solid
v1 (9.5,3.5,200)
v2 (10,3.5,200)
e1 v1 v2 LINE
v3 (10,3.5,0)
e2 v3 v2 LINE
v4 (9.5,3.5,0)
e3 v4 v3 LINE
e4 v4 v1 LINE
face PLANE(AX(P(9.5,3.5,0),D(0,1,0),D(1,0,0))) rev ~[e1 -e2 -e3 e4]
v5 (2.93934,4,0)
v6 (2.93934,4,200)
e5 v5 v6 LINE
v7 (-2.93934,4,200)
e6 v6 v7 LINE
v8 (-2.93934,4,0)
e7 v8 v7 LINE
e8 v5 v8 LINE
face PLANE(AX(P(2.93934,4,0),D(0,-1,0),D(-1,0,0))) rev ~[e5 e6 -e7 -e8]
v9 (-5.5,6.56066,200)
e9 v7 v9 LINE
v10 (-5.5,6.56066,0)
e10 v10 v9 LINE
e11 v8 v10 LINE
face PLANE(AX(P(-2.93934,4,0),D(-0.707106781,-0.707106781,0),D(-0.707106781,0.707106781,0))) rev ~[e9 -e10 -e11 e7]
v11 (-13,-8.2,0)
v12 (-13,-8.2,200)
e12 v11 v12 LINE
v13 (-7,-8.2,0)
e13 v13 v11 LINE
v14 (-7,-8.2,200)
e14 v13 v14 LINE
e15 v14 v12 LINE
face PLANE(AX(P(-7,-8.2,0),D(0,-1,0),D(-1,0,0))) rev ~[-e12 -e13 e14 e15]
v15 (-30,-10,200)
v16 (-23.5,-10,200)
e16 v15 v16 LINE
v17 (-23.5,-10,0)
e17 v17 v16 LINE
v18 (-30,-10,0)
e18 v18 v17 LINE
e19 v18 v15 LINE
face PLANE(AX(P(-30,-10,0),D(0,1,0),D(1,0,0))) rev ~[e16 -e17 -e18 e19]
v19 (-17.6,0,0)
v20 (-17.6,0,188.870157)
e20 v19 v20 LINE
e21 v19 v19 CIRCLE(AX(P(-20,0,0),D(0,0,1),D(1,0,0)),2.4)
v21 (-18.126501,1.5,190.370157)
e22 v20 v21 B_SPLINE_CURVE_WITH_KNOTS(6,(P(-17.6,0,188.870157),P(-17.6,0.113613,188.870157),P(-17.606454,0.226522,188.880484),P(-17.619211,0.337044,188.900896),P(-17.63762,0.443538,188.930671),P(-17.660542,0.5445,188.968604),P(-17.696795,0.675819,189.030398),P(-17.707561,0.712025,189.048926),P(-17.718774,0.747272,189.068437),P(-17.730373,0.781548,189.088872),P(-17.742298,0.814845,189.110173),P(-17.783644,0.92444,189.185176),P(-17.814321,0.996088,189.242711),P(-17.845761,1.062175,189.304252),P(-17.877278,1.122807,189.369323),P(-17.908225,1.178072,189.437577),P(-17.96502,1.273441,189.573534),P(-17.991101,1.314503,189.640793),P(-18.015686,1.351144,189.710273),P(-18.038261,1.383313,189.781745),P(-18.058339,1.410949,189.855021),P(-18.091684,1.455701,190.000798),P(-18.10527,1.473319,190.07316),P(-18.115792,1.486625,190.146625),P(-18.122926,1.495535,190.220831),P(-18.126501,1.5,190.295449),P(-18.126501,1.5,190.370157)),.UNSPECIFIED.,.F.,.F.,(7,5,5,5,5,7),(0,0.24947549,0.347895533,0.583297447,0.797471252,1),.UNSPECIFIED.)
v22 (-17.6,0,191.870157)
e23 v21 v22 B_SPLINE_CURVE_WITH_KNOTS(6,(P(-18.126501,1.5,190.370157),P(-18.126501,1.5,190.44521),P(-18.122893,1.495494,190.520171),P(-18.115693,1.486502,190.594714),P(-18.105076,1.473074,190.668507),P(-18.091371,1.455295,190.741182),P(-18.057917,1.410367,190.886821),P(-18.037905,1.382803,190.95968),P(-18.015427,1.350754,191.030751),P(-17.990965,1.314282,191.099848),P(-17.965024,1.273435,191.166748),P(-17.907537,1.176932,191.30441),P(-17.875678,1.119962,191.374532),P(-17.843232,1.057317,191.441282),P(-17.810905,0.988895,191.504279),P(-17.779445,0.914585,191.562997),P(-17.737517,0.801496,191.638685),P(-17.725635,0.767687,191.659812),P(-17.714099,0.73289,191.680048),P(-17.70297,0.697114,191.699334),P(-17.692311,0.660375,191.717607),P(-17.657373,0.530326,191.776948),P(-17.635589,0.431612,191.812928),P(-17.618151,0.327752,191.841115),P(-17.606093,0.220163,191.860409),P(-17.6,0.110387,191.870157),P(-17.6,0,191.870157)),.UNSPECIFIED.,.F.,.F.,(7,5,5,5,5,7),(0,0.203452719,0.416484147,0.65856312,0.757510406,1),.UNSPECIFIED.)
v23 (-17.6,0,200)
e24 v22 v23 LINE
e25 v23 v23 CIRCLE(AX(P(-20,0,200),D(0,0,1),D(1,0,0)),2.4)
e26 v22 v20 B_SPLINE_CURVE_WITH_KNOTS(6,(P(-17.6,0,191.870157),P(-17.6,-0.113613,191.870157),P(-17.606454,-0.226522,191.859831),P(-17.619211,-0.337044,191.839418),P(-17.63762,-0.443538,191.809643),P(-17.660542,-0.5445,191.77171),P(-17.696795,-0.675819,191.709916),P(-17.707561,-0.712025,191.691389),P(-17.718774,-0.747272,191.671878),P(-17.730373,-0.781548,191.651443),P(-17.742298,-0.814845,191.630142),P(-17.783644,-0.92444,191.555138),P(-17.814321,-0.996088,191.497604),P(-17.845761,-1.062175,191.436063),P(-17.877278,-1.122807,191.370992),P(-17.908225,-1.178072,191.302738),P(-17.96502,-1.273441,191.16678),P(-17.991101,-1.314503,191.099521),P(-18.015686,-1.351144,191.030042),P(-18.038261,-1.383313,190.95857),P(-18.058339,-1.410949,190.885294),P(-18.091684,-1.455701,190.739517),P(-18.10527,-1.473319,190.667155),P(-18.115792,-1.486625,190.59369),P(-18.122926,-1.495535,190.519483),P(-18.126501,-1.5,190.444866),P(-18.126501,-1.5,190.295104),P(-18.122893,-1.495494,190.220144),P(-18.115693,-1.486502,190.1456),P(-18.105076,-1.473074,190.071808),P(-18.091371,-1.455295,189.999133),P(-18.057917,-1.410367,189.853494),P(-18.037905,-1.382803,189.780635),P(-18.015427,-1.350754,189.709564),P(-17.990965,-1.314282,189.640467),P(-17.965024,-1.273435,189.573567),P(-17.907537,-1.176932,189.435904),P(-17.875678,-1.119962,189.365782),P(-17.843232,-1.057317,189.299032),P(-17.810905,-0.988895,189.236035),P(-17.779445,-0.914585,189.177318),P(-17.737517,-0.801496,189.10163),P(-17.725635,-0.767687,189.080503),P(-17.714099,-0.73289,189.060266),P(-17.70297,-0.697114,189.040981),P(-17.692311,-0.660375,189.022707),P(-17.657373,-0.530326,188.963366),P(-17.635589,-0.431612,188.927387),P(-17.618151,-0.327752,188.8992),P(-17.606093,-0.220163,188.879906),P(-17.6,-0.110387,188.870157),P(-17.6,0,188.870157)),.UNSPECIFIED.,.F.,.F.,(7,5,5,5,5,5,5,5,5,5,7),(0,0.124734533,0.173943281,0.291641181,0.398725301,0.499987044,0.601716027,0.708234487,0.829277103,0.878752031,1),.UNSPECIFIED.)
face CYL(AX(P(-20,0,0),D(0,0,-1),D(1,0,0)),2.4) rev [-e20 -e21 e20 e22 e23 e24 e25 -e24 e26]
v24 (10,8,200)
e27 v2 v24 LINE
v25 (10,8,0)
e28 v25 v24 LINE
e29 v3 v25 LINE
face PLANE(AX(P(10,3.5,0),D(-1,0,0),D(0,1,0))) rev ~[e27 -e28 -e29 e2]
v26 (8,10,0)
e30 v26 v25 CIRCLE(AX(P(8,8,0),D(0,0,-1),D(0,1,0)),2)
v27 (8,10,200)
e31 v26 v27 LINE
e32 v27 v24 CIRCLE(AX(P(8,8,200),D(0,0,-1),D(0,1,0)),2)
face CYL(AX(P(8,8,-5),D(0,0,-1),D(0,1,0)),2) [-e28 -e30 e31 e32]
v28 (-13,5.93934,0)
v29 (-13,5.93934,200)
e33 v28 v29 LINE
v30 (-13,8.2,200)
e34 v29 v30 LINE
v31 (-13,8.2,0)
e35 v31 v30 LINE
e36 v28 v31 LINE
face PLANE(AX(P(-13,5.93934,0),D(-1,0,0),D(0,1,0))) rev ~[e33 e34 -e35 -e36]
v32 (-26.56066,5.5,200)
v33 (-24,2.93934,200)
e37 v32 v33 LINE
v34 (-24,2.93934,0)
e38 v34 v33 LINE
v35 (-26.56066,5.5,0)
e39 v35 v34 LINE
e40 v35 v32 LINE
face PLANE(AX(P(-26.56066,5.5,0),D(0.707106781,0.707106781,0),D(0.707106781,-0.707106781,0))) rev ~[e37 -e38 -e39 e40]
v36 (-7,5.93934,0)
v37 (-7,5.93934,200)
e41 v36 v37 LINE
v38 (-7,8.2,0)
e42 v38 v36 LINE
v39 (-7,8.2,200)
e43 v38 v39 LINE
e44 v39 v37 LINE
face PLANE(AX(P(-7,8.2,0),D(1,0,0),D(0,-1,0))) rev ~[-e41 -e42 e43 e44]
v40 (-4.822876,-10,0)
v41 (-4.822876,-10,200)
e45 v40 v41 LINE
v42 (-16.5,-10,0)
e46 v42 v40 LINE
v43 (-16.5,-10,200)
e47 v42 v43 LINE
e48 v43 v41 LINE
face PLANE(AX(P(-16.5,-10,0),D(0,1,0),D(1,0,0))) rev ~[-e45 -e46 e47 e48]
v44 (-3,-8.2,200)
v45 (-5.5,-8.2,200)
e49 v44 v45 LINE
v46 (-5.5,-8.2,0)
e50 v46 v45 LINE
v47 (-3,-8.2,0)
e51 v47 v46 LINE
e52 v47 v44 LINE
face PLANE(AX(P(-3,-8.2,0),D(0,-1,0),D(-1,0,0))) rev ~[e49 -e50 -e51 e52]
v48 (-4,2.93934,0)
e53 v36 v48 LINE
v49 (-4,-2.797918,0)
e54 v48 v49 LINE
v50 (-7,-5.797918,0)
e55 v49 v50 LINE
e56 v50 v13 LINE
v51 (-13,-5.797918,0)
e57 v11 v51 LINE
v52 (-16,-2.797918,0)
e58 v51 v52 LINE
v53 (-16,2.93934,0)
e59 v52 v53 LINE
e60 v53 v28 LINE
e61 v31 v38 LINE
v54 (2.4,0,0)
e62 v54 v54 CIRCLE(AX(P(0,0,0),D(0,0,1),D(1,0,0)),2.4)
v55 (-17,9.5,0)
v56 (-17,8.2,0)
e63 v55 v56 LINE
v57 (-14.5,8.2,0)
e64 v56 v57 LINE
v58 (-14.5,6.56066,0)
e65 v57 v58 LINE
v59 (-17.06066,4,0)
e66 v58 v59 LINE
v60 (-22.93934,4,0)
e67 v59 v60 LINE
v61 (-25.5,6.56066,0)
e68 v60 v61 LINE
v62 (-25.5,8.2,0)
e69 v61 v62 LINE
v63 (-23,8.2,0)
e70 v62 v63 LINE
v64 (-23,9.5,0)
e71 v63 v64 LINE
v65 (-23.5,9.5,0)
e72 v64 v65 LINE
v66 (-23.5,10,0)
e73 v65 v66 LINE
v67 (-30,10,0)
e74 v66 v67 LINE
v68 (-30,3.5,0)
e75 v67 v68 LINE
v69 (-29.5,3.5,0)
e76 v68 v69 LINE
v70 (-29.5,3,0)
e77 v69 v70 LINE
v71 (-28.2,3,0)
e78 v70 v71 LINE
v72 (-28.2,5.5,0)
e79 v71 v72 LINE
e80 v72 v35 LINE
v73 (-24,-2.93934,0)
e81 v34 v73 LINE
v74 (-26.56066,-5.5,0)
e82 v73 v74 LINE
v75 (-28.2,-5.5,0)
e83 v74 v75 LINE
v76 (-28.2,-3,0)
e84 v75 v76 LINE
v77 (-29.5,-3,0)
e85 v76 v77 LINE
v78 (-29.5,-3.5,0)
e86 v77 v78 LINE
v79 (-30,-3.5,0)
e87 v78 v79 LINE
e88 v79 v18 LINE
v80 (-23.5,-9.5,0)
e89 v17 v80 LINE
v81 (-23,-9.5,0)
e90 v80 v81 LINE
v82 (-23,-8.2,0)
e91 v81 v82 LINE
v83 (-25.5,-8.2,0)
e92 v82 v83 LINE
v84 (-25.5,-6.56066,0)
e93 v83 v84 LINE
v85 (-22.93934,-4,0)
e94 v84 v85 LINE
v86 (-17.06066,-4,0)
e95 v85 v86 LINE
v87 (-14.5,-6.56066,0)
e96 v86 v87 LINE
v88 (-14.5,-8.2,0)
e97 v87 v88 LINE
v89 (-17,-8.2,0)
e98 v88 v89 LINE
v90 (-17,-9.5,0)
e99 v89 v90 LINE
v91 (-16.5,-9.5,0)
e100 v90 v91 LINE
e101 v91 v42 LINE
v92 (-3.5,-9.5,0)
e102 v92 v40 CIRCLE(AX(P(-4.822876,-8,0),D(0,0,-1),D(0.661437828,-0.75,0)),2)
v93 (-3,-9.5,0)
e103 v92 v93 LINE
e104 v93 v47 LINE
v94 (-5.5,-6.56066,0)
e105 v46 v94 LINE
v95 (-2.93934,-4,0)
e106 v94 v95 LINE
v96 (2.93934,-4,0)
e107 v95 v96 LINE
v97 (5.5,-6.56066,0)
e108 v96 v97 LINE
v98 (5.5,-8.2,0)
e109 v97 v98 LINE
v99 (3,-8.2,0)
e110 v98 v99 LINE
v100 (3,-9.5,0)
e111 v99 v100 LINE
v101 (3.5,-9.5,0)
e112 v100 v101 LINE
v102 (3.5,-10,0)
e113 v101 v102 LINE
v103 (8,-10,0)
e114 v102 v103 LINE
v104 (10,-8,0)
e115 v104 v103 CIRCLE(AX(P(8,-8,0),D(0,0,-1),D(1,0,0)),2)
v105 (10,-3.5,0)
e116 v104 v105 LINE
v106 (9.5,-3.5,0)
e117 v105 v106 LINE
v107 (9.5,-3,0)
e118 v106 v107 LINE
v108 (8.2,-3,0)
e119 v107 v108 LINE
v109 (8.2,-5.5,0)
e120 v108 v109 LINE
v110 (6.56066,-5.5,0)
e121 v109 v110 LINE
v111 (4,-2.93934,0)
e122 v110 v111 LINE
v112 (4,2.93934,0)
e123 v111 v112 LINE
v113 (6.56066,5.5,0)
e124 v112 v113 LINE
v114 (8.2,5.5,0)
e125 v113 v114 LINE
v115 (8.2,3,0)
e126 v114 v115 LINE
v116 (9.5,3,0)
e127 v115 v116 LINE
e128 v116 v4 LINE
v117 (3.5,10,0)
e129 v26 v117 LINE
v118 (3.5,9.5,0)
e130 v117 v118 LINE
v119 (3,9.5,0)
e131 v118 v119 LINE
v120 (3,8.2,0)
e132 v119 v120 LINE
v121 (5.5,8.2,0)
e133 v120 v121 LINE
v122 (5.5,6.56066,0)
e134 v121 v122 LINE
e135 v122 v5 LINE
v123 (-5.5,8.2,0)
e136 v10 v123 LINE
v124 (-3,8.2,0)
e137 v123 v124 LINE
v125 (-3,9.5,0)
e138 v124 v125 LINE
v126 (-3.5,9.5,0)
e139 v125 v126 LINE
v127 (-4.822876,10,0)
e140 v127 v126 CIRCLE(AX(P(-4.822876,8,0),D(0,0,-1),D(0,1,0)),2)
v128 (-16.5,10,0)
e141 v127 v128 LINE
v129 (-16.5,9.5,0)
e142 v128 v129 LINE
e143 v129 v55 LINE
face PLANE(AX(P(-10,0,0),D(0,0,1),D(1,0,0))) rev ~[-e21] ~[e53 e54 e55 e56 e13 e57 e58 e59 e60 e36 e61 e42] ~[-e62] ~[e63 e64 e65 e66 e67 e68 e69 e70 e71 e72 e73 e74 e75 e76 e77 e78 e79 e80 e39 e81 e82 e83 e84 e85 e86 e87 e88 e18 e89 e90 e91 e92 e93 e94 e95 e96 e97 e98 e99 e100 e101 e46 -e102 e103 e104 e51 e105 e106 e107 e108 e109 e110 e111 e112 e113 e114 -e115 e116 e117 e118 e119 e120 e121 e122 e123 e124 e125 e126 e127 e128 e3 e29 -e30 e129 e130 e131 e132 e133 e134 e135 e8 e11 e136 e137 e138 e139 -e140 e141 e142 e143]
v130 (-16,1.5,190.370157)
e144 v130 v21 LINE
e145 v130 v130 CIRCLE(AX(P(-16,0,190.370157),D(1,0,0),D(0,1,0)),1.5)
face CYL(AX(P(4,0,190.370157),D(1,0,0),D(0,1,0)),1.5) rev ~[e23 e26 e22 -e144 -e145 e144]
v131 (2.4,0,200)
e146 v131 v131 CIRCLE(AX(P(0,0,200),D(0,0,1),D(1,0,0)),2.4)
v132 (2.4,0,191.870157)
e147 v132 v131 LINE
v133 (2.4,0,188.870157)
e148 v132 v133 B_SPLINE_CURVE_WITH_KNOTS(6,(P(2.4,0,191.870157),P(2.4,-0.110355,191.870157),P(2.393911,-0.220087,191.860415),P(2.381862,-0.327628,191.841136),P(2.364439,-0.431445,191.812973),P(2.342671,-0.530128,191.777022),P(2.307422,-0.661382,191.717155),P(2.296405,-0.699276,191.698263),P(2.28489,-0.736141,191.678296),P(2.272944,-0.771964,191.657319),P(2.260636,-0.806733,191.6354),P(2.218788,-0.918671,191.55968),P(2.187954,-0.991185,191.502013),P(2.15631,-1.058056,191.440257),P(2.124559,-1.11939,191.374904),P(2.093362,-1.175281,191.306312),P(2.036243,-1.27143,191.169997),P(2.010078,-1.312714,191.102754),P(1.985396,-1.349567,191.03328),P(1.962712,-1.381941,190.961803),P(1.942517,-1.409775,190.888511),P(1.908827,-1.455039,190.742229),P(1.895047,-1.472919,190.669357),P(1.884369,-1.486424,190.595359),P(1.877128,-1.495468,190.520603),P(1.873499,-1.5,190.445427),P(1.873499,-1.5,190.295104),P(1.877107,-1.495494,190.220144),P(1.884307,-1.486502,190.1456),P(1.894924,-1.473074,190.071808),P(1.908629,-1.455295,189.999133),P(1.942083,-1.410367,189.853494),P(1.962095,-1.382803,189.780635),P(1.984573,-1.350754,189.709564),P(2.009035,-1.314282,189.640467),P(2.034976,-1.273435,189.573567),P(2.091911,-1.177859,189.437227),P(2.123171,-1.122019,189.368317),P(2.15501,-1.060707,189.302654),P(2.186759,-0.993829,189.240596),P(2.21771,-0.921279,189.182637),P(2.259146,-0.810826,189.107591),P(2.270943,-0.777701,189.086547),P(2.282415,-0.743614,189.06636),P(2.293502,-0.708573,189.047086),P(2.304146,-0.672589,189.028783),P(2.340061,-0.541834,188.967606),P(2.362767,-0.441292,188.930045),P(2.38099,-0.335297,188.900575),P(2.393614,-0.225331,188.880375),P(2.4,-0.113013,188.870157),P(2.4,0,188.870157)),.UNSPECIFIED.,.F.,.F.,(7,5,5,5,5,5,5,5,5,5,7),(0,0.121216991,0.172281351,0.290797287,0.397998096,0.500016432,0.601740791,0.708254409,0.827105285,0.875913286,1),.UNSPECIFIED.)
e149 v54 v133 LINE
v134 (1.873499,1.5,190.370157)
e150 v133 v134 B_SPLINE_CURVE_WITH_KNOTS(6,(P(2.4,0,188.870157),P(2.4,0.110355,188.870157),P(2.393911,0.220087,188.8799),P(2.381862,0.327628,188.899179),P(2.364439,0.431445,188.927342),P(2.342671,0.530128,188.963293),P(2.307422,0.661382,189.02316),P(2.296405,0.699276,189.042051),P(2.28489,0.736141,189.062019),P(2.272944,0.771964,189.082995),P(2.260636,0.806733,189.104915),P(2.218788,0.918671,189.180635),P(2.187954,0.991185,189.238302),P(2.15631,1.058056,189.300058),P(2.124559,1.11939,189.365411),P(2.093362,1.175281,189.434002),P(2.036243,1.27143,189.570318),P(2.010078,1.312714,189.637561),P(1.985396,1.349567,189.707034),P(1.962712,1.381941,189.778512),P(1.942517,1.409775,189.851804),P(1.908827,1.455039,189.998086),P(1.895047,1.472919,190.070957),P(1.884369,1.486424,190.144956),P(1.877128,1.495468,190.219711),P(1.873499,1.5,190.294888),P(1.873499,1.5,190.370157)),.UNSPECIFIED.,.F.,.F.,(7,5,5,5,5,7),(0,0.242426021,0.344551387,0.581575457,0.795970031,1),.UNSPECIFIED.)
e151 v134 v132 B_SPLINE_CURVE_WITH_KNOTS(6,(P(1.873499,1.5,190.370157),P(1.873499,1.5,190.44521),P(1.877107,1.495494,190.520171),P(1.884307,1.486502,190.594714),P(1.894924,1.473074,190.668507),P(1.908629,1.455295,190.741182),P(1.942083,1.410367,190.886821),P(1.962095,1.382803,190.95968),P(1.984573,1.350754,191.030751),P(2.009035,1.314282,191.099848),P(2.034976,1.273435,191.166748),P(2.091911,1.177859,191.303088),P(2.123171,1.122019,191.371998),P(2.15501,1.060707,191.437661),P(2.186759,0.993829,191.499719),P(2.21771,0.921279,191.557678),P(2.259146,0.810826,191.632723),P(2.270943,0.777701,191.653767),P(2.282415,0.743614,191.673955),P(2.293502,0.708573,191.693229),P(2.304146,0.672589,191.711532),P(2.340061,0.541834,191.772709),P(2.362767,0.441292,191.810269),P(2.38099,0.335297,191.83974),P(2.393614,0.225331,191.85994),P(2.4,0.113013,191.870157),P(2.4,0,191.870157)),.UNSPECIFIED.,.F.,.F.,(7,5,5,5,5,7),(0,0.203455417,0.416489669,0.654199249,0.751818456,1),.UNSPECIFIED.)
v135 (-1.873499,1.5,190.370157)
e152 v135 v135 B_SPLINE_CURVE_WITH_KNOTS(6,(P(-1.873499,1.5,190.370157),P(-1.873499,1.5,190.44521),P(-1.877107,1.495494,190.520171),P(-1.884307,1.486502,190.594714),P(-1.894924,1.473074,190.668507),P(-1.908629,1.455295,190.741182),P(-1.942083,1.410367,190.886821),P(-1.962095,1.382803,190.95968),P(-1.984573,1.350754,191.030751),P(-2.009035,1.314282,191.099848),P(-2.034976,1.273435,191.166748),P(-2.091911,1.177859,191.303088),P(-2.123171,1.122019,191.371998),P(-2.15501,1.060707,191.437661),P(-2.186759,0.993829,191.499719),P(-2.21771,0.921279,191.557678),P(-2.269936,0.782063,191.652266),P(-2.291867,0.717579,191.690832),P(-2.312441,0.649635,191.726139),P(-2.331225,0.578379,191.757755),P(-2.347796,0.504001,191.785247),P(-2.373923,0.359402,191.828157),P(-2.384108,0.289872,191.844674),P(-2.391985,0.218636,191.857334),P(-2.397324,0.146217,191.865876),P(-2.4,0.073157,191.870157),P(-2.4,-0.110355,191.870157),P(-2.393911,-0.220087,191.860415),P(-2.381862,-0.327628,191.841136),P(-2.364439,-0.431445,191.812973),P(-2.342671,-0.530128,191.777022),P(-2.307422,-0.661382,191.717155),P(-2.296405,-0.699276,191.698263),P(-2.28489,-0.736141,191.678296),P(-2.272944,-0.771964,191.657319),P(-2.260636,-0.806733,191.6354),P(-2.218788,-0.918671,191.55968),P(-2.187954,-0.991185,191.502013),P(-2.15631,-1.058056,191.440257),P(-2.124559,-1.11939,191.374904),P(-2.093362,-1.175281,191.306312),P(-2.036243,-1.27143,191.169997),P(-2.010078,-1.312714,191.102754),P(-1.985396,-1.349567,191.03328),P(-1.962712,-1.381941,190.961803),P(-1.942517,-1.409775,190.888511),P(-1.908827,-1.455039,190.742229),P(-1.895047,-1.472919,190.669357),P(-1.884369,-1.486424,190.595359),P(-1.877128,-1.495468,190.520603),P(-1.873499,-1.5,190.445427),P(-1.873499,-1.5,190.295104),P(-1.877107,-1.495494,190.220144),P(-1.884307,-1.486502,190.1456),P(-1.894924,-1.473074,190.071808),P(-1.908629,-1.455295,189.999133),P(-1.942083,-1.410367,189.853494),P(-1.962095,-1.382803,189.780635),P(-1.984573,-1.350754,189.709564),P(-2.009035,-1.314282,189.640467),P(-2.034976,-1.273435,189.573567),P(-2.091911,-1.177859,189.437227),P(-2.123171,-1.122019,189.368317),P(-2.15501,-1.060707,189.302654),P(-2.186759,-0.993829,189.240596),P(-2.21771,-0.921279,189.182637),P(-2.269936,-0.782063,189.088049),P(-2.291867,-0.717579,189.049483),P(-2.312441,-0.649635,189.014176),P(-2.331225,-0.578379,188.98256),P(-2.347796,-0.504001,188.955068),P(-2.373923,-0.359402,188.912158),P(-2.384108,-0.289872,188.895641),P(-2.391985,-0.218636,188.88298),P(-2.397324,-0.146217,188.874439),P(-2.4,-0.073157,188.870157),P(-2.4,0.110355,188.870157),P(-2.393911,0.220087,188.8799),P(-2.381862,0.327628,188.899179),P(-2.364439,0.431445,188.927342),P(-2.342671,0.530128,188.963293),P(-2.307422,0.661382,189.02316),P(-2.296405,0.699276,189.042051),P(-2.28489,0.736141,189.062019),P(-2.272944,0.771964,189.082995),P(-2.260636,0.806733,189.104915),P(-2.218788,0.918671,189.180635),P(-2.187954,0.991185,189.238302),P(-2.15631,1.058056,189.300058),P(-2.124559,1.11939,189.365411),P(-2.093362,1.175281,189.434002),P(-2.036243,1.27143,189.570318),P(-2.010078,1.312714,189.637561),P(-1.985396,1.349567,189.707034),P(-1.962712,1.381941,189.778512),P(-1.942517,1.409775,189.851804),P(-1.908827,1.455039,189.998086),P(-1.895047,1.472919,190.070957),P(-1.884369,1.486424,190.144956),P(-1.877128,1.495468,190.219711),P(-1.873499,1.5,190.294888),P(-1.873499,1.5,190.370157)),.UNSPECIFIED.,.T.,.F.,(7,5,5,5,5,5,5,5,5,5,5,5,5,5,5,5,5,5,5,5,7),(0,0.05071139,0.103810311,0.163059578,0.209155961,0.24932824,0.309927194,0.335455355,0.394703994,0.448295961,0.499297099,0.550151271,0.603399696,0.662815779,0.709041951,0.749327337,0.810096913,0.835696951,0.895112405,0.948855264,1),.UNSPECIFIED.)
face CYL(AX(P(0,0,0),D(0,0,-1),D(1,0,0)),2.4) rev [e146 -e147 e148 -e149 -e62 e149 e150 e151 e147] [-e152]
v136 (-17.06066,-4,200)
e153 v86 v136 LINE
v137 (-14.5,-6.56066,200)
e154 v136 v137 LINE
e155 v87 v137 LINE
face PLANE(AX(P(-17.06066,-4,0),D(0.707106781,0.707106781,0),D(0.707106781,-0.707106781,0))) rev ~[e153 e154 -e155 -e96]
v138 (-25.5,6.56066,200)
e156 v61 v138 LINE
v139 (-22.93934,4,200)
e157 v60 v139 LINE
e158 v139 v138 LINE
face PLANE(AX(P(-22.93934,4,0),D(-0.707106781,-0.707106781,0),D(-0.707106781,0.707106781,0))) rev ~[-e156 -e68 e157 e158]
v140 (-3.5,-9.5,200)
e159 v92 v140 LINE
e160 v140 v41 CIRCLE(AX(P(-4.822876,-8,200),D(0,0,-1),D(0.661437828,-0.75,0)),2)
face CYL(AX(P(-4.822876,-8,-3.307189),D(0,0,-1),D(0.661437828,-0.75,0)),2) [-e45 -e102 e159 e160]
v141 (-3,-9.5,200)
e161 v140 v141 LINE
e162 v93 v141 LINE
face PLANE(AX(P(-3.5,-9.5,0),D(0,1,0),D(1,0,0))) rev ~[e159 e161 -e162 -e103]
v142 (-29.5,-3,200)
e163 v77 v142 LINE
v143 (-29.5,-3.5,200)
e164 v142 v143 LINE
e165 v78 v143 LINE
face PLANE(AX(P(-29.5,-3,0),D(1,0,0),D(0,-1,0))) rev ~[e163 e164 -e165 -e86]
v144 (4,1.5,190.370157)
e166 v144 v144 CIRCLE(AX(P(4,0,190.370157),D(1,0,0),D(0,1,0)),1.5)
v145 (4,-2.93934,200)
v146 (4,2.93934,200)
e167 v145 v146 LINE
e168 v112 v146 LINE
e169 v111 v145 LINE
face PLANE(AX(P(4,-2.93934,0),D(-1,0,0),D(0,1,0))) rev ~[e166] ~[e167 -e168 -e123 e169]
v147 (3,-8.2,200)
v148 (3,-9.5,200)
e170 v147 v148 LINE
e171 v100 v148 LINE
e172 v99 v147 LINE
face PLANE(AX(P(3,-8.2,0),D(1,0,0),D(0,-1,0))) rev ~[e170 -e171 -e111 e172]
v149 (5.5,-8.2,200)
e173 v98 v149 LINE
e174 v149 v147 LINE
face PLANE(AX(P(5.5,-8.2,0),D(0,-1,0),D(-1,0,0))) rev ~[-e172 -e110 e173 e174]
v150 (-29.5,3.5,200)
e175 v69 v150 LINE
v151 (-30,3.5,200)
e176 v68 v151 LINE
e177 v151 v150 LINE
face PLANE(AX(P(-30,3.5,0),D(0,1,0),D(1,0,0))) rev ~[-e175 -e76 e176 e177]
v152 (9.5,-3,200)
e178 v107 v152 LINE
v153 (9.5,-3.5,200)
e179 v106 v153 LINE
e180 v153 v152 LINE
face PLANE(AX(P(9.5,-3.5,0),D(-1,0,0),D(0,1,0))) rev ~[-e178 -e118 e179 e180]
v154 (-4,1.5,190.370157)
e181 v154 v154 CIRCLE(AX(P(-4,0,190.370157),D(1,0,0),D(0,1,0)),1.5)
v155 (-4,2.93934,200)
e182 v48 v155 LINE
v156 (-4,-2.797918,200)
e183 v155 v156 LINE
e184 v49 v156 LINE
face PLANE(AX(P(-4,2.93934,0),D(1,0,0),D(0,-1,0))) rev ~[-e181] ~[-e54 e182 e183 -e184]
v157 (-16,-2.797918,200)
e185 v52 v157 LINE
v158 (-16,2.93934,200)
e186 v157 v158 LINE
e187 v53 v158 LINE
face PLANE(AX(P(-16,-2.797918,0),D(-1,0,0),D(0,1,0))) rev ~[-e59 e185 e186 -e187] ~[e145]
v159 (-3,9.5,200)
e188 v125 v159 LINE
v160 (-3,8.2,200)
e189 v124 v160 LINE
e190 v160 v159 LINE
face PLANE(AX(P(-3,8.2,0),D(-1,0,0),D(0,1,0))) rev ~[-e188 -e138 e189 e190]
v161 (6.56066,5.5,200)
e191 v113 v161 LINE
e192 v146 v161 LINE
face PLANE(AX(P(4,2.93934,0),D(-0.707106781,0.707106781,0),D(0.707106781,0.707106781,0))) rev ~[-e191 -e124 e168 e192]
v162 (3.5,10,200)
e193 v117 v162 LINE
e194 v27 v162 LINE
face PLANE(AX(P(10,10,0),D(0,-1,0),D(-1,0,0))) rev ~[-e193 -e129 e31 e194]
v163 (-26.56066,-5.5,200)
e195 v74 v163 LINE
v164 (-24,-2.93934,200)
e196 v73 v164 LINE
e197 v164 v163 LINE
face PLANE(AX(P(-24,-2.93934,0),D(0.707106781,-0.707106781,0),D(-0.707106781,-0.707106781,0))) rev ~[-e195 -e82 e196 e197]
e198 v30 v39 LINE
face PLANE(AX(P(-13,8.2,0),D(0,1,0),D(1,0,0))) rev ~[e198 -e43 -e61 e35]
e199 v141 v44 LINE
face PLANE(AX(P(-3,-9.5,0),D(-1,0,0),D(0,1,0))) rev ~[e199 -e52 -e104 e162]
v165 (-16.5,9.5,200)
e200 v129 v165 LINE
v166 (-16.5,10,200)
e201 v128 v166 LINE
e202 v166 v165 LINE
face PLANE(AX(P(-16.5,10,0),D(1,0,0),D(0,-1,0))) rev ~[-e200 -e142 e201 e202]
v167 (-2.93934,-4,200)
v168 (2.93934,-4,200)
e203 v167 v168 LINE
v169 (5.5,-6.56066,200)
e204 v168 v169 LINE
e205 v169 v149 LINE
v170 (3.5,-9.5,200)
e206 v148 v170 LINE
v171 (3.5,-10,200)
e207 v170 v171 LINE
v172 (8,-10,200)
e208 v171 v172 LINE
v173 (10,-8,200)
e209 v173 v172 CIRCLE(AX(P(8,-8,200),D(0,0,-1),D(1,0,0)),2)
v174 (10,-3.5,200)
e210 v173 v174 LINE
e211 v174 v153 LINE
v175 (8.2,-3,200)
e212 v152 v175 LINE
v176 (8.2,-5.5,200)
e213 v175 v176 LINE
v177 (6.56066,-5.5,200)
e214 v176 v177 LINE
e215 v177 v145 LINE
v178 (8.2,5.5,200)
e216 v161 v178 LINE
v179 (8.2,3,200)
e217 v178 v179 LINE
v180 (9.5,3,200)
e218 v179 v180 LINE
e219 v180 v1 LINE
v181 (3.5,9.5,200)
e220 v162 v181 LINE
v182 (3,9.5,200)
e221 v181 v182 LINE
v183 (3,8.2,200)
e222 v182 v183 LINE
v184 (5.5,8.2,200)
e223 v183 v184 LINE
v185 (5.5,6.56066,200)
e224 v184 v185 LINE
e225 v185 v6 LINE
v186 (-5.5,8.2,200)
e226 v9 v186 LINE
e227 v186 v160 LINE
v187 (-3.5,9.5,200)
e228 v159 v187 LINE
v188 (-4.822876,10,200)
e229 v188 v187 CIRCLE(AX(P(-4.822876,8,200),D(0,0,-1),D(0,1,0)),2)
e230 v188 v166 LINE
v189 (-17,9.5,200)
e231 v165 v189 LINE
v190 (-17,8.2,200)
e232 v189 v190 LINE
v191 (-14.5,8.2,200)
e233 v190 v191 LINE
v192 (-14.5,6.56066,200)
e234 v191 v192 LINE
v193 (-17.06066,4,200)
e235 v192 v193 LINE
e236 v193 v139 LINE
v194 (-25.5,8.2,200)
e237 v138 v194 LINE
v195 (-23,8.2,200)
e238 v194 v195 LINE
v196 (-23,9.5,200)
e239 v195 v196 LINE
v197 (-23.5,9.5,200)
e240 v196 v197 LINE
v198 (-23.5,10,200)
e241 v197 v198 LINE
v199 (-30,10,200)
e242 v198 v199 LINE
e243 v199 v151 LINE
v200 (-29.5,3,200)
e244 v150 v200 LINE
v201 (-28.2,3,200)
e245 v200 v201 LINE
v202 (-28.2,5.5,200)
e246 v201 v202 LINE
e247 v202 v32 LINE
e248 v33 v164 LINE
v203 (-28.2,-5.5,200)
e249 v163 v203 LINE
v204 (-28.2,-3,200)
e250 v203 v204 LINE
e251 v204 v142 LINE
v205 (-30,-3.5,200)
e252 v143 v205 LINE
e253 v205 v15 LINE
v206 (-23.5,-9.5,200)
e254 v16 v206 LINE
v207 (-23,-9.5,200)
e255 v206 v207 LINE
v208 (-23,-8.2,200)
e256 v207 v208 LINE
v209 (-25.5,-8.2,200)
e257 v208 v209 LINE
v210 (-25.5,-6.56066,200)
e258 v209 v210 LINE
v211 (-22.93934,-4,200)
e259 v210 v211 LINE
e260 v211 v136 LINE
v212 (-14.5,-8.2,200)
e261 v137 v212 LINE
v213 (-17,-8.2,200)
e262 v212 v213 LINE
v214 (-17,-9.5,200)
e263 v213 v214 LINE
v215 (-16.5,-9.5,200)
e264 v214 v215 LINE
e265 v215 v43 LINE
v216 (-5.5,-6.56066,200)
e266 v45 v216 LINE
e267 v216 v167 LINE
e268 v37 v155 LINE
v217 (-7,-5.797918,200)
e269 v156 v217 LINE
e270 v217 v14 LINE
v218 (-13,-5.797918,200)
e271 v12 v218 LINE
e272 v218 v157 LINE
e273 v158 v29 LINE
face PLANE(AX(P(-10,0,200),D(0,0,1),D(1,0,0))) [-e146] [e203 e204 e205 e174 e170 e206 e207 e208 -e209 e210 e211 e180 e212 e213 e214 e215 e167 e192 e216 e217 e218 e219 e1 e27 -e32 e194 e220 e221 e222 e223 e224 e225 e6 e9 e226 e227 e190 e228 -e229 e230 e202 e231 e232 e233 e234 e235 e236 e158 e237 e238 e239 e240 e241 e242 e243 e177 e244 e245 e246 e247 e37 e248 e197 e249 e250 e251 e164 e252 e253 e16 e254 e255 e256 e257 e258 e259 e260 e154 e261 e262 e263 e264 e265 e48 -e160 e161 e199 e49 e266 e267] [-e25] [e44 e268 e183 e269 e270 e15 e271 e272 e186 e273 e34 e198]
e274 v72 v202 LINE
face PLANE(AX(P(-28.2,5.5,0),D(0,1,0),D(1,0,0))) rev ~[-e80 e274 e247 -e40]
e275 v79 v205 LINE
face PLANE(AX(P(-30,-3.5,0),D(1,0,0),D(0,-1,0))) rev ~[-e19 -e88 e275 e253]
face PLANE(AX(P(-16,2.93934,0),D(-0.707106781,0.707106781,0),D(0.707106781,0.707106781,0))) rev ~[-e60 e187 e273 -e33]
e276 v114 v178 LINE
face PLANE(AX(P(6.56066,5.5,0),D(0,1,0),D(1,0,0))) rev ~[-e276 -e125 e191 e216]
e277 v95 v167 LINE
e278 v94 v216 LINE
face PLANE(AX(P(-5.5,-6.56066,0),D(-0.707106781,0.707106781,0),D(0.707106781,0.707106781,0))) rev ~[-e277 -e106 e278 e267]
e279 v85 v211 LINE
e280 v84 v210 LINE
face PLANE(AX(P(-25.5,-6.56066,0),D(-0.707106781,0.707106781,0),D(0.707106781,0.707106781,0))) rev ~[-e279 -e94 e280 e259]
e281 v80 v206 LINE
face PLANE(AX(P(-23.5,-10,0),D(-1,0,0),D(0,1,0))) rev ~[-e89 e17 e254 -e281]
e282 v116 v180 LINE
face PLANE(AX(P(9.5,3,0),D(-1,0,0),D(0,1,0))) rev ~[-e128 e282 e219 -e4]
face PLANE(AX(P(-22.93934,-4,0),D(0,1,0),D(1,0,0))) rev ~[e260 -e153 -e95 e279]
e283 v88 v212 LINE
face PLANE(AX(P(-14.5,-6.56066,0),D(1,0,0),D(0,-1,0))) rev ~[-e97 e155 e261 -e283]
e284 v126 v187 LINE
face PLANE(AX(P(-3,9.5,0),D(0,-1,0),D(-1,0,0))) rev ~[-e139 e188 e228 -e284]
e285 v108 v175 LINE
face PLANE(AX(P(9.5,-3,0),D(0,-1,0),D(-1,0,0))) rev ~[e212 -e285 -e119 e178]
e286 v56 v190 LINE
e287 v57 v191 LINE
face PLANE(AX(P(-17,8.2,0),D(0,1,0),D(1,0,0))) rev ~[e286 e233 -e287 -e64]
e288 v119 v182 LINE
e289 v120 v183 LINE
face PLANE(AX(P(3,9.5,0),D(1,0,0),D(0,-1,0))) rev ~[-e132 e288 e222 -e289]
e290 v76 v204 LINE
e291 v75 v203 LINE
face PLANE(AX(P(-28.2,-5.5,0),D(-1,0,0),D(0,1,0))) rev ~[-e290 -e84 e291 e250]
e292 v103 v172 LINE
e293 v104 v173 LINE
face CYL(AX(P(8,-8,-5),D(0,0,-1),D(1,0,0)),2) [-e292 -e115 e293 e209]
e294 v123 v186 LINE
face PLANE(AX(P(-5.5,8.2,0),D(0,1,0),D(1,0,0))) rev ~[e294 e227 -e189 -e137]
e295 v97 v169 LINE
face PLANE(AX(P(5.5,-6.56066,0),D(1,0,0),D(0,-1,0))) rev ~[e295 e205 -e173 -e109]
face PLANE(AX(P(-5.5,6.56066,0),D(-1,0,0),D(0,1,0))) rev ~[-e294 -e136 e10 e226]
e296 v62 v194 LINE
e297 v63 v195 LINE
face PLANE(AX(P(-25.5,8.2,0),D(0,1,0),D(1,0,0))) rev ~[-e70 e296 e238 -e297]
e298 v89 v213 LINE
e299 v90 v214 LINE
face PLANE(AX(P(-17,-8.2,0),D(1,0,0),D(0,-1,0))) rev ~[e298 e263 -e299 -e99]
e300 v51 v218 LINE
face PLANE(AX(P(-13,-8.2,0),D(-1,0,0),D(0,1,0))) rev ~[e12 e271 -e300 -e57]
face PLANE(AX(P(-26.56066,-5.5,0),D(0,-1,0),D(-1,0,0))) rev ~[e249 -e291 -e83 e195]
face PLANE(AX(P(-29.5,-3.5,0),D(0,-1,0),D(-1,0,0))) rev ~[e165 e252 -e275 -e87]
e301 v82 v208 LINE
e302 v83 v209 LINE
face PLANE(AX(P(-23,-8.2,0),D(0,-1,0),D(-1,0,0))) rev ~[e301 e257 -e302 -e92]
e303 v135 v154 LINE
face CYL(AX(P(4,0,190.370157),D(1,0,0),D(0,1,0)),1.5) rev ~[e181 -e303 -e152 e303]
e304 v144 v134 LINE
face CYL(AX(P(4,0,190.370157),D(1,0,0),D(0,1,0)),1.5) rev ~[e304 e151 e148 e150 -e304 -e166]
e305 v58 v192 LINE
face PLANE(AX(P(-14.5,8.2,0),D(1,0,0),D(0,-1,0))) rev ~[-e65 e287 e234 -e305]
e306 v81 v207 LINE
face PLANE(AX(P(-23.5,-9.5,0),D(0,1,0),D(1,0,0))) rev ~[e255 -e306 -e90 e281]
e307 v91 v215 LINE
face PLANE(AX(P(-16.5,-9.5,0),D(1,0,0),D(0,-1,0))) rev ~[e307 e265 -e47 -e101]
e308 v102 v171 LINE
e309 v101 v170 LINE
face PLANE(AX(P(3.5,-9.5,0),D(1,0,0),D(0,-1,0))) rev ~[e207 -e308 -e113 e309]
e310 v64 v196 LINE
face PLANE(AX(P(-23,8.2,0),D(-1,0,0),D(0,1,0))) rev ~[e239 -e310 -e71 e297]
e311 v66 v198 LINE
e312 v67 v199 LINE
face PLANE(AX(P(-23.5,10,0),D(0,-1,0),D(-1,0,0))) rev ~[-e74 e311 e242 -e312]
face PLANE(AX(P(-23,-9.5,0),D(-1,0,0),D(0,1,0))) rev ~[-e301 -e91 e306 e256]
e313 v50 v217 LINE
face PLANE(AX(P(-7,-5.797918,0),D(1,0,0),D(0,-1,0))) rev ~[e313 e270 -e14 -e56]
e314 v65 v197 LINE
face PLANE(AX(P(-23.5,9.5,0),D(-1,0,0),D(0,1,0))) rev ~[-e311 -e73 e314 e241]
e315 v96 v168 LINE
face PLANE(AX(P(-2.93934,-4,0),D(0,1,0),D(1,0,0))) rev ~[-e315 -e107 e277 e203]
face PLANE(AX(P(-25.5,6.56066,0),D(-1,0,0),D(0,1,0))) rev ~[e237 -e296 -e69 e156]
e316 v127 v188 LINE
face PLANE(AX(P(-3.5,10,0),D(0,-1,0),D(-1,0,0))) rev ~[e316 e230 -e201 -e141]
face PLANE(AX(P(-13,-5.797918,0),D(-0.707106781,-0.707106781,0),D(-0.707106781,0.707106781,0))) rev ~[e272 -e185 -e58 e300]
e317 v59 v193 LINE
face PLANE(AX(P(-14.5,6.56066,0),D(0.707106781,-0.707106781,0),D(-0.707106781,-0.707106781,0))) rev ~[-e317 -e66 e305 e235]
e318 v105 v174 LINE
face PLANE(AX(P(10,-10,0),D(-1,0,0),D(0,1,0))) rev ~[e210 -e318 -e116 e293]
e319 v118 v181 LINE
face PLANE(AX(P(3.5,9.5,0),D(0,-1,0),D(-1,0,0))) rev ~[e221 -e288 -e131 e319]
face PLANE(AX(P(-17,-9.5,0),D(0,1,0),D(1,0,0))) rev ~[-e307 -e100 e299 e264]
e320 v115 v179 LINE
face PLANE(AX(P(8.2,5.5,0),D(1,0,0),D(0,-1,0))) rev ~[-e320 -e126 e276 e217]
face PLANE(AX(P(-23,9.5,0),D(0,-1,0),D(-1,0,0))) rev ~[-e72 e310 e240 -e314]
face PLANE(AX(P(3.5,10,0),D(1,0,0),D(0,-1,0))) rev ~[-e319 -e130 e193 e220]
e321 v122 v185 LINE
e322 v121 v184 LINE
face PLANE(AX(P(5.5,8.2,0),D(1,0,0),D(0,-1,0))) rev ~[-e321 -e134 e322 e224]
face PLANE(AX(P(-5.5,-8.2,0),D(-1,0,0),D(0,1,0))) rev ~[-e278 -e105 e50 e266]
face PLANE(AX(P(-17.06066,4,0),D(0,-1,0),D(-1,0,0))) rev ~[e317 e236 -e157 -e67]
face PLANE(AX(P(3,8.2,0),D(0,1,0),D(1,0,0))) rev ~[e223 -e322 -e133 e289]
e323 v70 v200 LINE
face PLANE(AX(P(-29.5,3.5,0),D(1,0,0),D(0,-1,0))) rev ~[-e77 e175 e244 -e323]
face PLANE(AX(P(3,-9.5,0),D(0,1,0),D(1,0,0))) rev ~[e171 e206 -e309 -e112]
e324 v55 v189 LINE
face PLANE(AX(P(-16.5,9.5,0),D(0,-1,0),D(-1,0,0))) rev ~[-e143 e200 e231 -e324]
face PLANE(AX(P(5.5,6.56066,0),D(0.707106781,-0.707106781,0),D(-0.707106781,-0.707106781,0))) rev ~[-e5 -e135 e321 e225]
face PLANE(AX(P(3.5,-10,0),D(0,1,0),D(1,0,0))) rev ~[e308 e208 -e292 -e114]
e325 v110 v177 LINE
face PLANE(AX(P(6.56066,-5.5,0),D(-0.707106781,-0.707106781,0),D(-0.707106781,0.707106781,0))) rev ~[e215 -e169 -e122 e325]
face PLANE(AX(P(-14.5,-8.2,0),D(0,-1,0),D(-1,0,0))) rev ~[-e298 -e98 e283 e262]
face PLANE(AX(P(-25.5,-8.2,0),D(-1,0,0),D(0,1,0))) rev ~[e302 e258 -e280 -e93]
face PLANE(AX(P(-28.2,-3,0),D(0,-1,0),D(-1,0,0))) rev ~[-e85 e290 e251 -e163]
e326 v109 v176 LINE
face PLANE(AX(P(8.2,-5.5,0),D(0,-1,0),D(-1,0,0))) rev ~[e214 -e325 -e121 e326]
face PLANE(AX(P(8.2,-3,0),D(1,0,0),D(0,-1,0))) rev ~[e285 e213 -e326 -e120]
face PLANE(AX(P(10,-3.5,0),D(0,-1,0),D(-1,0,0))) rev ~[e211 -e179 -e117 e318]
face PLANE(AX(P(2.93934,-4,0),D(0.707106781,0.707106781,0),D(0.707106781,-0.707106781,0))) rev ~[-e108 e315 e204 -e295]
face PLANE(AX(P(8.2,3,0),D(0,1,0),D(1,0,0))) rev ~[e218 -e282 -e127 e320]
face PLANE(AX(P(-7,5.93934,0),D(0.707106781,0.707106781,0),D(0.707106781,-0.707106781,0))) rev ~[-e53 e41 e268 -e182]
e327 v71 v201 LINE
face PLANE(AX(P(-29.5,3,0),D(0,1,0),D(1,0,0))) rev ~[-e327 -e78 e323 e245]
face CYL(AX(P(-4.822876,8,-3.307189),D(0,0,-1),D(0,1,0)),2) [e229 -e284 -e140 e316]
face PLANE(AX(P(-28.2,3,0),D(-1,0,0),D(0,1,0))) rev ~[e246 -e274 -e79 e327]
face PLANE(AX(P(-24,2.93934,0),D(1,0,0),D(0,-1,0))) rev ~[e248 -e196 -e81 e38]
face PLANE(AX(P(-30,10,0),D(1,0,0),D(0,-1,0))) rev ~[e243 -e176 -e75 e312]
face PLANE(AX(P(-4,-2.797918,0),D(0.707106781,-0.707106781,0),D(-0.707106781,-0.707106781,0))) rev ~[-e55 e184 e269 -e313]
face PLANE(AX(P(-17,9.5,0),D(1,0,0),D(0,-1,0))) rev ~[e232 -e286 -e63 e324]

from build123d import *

# Parameters (mm, degrees)
F0_R        = 2.4
F1_DEPTH    = 200
F2_T1_DEPTH = 210
F2_T3_DEPTH = 206.6143782777
F3_R        = 1.5
F4_DEPTH    = 25


# Not quite as in the source:
# - a fillet or chamfer that OpenCascade refuses, or shapes differently, is made with other operations: its cross-section is extruded or revolved along the edge and cut away or added


with BuildPart() as f1:
    # F0 (on Top) → F1 (new body)
    with BuildSketch(Plane.XY):
        Polygon((10, 3.5), (10, 10), (3.5, 10), (3.5, 9.5), (3, 9.5), (3, 8.2), (5.5, 8.2), (5.5, 6.5606601718), (2.9393398282, 4), (0, 4), (-2.9393398282, 4), (-5.5, 6.5606601718), (-5.5, 8.2), (-3, 8.2), (-3, 9.5), (-3.5, 9.5), (-3.5, 10), (-10, 10), (-16.5, 10), (-16.5, 9.5), (-17, 9.5), (-17, 8.2), (-14.5, 8.2), (-14.5, 6.5606601718), (-17.0606601718, 4), (-20, 4), (-22.9393398282, 4), (-25.5, 6.5606601718), (-25.5, 8.2), (-23, 8.2), (-23, 9.5), (-23.5, 9.5), (-23.5, 10), (-30, 10), (-30, 3.5), (-29.5, 3.5), (-29.5, 3), (-28.2, 3), (-28.2, 5.5), (-26.5606601718, 5.5), (-24, 2.9393398282), (-24, -2.9393398282), (-26.5606601718, -5.5), (-28.2, -5.5), (-28.2, -3), (-29.5, -3), (-29.5, -3.5), (-30, -3.5), (-30, -10), (-23.5, -10), (-23.5, -9.5), (-23, -9.5), (-23, -8.2), (-25.5, -8.2), (-25.5, -6.5606601718), (-22.9393398282, -4), (-20, -4), (-17.0606601718, -4), (-14.5, -6.5606601718), (-14.5, -8.2), (-17, -8.2), (-17, -9.5), (-16.5, -9.5), (-16.5, -10), (-10, -10), (-3.5, -10), (-3.5, -9.5), (-3, -9.5), (-3, -8.2), (-5.5, -8.2), (-5.5, -6.5606601718), (-2.9393398282, -4), (0, -4), (2.9393398282, -4), (5.5, -6.5606601718), (5.5, -8.2), (3, -8.2), (3, -9.5), (3.5, -9.5), (3.5, -10), (10, -10), (10, -3.5), (9.5, -3.5), (9.5, -3), (8.2, -3), (8.2, -5.5), (6.5606601718, -5.5), (4, -2.9393398282), (4, 2.9393398282), (6.5606601718, 5.5), (8.2, 5.5), (8.2, 3), (9.5, 3), (9.5, 3.5), align=None)
        with Locations((-20, 0)):
            Circle(F0_R, mode=Mode.SUBTRACT)
        Polygon((-7, 5.9393398282), (-4, 2.9393398282), (-4, -2.797918472), (-7, -5.797918472), (-7, -8.2), (-13, -8.2), (-13, -5.797918472), (-16, -2.797918472), (-16, 2.9393398282), (-13, 5.9393398282), (-13, 8.2), (-7, 8.2), align=None, mode=Mode.SUBTRACT)
        Circle(F0_R, mode=Mode.SUBTRACT)
    extrude(amount=F1_DEPTH)

    # F2: fillet of radius 2 on 4 edges, made by hand

    # F2_s2 → F2_t1 (cut)
    with BuildSketch(Plane.XY.offset(-5)):
        with BuildLine():
            ThreePointArc((8, 10), (9.4142135624, 9.4142135624), (10, 8))
            Line((10, 8), (10, 10))
            Line((10, 10), (8, 10))
        make_face()
        with BuildLine():
            ThreePointArc((10, -8), (9.4142135624, -9.4142135624), (8, -10))
            Line((8, -10), (10, -10))
            Line((10, -10), (10, -8))
        make_face()
    extrude(amount=F2_T1_DEPTH, mode=Mode.SUBTRACT)

    # F2_s4 → F2_t3 (cut)
    with BuildSketch(Plane.XY.offset(-3.3071891388)):
        with BuildLine():
            ThreePointArc((-3.5, -9.5), (-4.1157688743, -9.8708286934), (-4.8228756555, -10))
            Line((-4.8228756555, -10), (-3.5, -10))
            Line((-3.5, -10), (-3.5, -9.5))
        make_face()
        with BuildLine():
            ThreePointArc((-4.8228756555, 10), (-4.1157688743, 9.8708286934), (-3.5, 9.5))
            Line((-3.5, 9.5), (-3.5, 10))
            Line((-3.5, 10), (-4.8228756555, 10))
        make_face()
    extrude(amount=F2_T3_DEPTH, mode=Mode.SUBTRACT)

    # F3 (on face) → F4 (cut)
    with BuildSketch(Plane.YZ.offset(4)):
        with Locations((0, 190.370157361)):
            Circle(F3_R)
    extrude(amount=-F4_DEPTH, mode=Mode.SUBTRACT)


solid = f1.part
